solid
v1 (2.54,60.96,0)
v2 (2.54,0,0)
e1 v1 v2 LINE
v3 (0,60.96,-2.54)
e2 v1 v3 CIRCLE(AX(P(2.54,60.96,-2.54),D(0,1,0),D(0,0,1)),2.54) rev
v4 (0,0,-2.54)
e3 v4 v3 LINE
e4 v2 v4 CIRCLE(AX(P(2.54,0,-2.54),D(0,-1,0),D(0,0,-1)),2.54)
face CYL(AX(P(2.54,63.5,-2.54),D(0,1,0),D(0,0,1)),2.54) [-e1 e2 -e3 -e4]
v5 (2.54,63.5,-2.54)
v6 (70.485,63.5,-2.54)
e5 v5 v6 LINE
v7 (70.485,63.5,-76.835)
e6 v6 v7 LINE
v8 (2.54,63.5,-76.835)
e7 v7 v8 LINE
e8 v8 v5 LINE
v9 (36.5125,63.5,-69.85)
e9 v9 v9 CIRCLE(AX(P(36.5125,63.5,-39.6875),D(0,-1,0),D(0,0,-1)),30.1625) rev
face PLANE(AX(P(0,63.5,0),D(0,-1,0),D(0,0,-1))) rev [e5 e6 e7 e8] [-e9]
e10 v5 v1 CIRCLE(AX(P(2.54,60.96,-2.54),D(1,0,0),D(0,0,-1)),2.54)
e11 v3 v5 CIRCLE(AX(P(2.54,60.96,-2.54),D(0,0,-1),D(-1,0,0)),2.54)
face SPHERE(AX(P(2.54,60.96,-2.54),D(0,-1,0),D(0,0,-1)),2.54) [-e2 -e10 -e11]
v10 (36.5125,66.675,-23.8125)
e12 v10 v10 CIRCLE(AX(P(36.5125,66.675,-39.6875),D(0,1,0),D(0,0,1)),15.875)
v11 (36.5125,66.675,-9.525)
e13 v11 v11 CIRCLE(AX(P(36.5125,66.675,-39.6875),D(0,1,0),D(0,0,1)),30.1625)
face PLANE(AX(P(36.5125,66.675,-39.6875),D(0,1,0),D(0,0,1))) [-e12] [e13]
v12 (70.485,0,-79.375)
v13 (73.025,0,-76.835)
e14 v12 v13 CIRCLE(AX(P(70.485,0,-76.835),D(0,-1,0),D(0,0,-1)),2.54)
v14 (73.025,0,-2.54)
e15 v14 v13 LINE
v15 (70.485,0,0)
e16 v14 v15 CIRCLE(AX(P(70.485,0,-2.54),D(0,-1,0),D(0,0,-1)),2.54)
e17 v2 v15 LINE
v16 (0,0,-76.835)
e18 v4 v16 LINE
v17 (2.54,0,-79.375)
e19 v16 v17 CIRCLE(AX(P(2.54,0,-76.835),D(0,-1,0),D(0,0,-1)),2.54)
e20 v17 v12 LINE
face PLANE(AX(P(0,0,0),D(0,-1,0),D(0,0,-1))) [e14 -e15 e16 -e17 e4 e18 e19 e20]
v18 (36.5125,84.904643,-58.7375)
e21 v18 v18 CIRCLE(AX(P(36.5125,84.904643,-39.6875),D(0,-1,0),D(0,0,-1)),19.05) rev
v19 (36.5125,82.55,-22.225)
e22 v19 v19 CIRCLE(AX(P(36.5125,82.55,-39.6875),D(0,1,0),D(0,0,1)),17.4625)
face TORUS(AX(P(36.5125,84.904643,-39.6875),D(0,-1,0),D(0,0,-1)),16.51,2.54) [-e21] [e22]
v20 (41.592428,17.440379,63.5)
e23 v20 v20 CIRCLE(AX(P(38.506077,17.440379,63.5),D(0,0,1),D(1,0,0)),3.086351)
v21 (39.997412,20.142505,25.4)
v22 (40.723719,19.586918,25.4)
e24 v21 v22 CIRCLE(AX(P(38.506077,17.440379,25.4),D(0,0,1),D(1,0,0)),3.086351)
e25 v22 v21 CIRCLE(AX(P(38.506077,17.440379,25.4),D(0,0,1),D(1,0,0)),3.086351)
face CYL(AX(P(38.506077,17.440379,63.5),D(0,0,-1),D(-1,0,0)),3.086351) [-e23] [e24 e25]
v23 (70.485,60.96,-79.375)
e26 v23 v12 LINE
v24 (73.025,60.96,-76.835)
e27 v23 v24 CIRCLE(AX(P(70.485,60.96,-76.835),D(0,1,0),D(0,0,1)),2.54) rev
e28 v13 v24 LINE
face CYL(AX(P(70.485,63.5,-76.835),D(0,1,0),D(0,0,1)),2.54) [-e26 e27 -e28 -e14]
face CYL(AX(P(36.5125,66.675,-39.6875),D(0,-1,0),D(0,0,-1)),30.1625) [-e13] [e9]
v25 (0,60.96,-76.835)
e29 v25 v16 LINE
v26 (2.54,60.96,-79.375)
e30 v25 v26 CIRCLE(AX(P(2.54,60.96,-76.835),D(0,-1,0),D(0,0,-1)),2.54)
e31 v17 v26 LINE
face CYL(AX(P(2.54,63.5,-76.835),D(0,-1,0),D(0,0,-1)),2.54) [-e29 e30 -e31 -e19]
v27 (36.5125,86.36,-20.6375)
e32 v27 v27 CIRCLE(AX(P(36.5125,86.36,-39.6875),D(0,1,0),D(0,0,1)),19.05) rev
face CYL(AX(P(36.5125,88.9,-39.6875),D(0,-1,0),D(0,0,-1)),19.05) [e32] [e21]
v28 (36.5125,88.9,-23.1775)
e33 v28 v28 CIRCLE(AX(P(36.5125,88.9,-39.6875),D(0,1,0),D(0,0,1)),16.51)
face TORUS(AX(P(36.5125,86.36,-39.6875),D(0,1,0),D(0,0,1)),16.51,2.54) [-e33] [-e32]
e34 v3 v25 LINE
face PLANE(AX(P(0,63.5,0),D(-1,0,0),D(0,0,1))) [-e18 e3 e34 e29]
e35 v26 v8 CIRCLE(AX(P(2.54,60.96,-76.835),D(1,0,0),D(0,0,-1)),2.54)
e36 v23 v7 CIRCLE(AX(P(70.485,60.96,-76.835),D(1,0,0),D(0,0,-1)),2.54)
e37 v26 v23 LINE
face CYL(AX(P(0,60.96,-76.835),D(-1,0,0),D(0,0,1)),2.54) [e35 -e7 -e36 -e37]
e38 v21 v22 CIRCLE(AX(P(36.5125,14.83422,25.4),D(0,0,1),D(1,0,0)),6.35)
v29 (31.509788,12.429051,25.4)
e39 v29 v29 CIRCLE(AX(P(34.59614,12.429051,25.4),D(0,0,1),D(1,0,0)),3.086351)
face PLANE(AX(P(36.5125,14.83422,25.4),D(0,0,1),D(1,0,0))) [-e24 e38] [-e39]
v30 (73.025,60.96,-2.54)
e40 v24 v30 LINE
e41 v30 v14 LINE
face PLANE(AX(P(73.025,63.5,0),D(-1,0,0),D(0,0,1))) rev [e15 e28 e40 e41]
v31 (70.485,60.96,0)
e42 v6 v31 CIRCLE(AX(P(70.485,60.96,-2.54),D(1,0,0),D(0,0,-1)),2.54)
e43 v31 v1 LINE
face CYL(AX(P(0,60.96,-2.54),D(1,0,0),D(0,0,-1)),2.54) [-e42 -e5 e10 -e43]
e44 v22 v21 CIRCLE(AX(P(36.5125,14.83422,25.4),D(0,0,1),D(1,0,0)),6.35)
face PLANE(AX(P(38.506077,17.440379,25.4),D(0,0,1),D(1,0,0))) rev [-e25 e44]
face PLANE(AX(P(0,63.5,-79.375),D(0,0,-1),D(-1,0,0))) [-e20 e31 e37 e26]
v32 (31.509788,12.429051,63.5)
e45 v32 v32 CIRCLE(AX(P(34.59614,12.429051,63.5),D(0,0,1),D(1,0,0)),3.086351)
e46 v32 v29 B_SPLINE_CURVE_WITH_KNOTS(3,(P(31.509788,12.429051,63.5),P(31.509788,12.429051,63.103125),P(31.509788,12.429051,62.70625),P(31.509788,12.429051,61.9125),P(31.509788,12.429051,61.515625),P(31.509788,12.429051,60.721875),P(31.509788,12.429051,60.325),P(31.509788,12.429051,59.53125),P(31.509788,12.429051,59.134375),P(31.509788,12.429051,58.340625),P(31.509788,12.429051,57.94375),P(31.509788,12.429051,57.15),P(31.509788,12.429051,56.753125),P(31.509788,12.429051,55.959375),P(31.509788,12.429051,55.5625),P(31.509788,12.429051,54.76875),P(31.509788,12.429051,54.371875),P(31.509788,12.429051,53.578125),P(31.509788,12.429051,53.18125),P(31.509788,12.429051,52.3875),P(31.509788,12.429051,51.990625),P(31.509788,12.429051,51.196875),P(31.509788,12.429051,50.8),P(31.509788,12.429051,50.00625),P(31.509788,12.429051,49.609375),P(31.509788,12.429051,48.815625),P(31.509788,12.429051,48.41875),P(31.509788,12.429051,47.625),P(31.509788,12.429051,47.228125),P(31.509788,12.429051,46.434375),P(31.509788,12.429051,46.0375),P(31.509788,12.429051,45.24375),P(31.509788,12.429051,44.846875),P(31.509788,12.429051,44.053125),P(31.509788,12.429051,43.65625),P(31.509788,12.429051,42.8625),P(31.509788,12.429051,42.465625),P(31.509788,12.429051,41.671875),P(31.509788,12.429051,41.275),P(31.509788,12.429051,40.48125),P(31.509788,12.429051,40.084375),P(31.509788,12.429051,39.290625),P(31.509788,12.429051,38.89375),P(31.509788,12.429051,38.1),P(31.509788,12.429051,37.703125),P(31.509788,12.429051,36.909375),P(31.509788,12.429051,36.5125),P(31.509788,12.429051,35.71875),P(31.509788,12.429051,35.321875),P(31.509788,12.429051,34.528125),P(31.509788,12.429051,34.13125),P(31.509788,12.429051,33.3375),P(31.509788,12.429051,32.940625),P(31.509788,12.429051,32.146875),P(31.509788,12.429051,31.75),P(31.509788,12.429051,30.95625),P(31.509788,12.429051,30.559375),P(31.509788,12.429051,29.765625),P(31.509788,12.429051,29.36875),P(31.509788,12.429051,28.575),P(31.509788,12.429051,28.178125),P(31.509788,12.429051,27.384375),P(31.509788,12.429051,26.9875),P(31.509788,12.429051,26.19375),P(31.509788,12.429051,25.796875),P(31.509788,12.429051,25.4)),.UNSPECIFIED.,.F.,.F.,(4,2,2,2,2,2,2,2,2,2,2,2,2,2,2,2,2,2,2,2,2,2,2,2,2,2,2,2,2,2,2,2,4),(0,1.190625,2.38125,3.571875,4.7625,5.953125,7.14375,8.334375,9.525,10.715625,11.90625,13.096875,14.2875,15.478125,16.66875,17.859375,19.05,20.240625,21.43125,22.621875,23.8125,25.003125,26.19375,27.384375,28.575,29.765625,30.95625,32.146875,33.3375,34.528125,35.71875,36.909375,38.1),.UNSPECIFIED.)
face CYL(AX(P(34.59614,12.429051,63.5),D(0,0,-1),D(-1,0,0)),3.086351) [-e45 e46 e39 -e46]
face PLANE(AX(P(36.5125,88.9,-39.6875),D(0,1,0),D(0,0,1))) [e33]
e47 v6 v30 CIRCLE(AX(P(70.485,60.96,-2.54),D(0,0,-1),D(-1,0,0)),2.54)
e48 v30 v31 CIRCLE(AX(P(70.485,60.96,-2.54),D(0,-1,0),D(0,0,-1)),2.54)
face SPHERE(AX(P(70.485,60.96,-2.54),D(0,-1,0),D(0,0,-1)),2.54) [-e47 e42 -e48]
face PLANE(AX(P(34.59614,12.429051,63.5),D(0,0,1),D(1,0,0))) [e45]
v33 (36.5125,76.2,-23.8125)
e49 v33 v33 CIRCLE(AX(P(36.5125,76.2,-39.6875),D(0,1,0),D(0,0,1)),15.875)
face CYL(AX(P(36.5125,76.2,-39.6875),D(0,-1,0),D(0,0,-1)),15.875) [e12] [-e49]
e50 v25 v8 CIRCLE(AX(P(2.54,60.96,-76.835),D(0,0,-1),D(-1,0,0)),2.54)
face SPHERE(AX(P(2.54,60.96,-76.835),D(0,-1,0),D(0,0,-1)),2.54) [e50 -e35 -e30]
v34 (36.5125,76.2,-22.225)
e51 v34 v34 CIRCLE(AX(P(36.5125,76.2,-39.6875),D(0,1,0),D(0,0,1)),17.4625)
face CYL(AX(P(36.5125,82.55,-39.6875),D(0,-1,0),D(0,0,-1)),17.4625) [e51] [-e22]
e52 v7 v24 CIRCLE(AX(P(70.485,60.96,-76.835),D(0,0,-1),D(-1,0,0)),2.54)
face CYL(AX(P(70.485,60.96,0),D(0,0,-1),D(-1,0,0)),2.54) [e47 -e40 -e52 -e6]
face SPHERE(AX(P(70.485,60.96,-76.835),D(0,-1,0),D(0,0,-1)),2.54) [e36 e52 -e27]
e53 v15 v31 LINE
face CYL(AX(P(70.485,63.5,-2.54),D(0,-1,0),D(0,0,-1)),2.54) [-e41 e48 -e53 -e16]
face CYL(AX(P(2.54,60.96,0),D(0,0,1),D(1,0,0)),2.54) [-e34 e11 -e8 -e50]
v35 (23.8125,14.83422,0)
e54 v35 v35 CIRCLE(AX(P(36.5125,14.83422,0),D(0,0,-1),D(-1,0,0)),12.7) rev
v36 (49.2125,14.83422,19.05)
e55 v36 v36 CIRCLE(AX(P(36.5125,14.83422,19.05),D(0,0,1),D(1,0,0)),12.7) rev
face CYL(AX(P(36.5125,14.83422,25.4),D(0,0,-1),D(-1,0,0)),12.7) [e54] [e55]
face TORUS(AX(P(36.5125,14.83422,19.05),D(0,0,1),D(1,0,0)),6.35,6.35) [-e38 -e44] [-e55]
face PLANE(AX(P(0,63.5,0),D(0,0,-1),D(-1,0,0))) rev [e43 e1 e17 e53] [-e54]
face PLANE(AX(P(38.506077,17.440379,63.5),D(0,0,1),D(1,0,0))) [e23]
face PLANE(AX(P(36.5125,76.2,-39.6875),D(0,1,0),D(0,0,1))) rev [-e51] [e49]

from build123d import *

# Parameters (mm, degrees)
SKETCH1_W           = 73.025
SKETCH1_H           = 79.375
BOSS_EXTRUDE1_DEPTH = 63.5
SKETCH2_R           = 15.875
BOSS_EXTRUDE2_DEPTH = 12.7
SKETCH3_R           = 30.1625
BOSS_EXTRUDE3_DEPTH = 3.175
SKETCH4_R           = 17.4625
BOSS_EXTRUDE4_DEPTH = 6.35
SKETCH5_R           = 19.05
BOSS_EXTRUDE5_DEPTH = 6.35
FILLET1_R           = 2.54
FILLET2_R           = 2.54
FILLET5_R           = 2.54
SKETCH7_R           = 12.7
BOSS_EXTRUDE7_DEPTH = 25.4
FILLET6_R           = 6.35
SKETCH8_R           = 3.086351458
BOSS_EXTRUDE8_DEPTH = 38.1


with BuildPart() as part:
    # Sketch1 → Boss-Extrude1 (new body)
    with BuildSketch(Plane(origin=(0, 0, 0), x_dir=(1, 0, 0), z_dir=(0, 1, 0))):
        with Locations((36.5125, 39.6875)):
            Rectangle(SKETCH1_W, SKETCH1_H)
    extrude(amount=BOSS_EXTRUDE1_DEPTH)

    # Sketch2 → Boss-Extrude2 (add)
    with BuildSketch(Plane(origin=(0, 63.5, 0), x_dir=(1, 0, 0), z_dir=(0, 1, 0))):
        with Locations(Location((36.5125, 39.6875, 0), (0, 0, 270))):
            Circle(SKETCH2_R)
    extrude(amount=BOSS_EXTRUDE2_DEPTH)

    # Sketch3 → Boss-Extrude3 (add)
    with BuildSketch(Plane(origin=(0, 63.5, 0), x_dir=(1, 0, 0), z_dir=(0, 1, 0))):
        with Locations(Location((36.5125, 39.6875, 0), (0, 0, 90))):
            Circle(SKETCH3_R)
    extrude(amount=BOSS_EXTRUDE3_DEPTH)

    # Sketch4 → Boss-Extrude4 (add)
    with BuildSketch(Plane(origin=(0, 76.2, 0), x_dir=(1, 0, 0), z_dir=(0, 1, 0))):
        with Locations(Location((36.5125, 39.6875, 0), (0, 0, 270))):
            Circle(SKETCH4_R)
    extrude(amount=BOSS_EXTRUDE4_DEPTH)

    # Sketch5 → Boss-Extrude5 (add)
    with BuildSketch(Plane(origin=(0, 82.55, 0), x_dir=(1, 0, 0), z_dir=(0, 1, 0))):
        with Locations(Location((36.5125, 39.6875, 0), (0, 0, 270))):
            Circle(SKETCH5_R)
    extrude(amount=BOSS_EXTRUDE5_DEPTH)

    # Fillet1
    # the kernel refuses this fillet: 2.54 mm, written as the material it takes off along each edge
    with BuildSketch(Plane(origin=(36.5125, 82.55, -39.6875), x_dir=(0, 0, 1), z_dir=(-1, 0, 0))) as fillet1_piece_1:
        with BuildLine():
            CenterArc((16.51, 2.35464302), FILLET1_R, 292.024312837, 67.975687163)
            Line((17.4625, 0), (17.48155, -0.04709286))
            ThreePointArc((17.48155, -0.04709286), (18.25625, -0.0508), (19.05, -0.0508))
            Line((19.05, -0.0508), (19.1008, 0))
            Line((19.1008, 0), (19.1008, 2.35464302))
            Line((19.1008, 2.35464302), (19.05, 2.35464302))
        make_face()
    revolve(axis=Axis((36.5125, 82.55, -39.6875), (0, 1, 0)), mode=Mode.SUBTRACT)
    with BuildSketch(Plane(origin=(36.5125, 88.9, -39.6875), x_dir=(0, 0, 1), z_dir=(-1, 0, 0))) as fillet1_piece_2:
        with BuildLine():
            CenterArc((19.05 - FILLET1_R, -FILLET1_R), FILLET1_R, 0, 90)
            Line((19.05 - FILLET1_R, 0), (19.05 - FILLET1_R, FILLET1_R * 0.02))
            Line((19.05 - FILLET1_R, FILLET1_R * 0.02), (19.05 + FILLET1_R * 0.02, FILLET1_R * 0.02))
            Line((19.05 + FILLET1_R * 0.02, FILLET1_R * 0.02), (19.05 + FILLET1_R * 0.02, -FILLET1_R))
            Line((19.05 + FILLET1_R * 0.02, -FILLET1_R), (19.05, -FILLET1_R))
        make_face()
    revolve(axis=Axis((36.5125, 88.9, -39.6875), (0, 1, 0)), mode=Mode.SUBTRACT)

    # Fillet2
    fillet2_edges = [part.edges().sort_by_distance(p)[0] for p in [
        (0, 31.75, 0),
        (73.025, 31.75, 0),
        (73.025, 31.75, -79.375),
        (0, 31.75, -79.375),
    ]]
    fillet(fillet2_edges, radius=FILLET2_R)

    # Fillet5
    fillet5_edges = [part.edges().sort_by_distance(p)[0] for p in [
        (36.5125, 63.5, -79.375),
        (73.025, 63.5, -39.6875),
        (0, 63.5, -39.6875),
        (36.5125, 63.5, 0),
        (0.743948776, 63.5, -78.631051224),
        (0.743948776, 63.5, -0.743948776),
        (72.281051224, 63.5, -0.743948776),
        (72.281051224, 63.5, -78.631051224),
    ]]
    fillet(fillet5_edges, radius=FILLET5_R)

    # Sketch7 → Boss-Extrude7 (add)
    with BuildSketch(Plane.XY):
        with Locations(Location((36.5125, 14.834220105, 0), (0, 0, 180))):
            Circle(SKETCH7_R)
    extrude(amount=BOSS_EXTRUDE7_DEPTH)

    # Fillet6
    fillet6_edges = [part.edges().sort_by_distance(p)[0] for p in [
        (49.2125, 14.834220105, 25.4),
    ]]
    fillet(fillet6_edges, radius=FILLET6_R)

    # Sketch8 → Boss-Extrude8 (add)
    with BuildSketch(Plane.XY.offset(25.4)):
        with Locations(Location((38.506076801, 17.440379035, 0), (0, 0, 61.105176003))):
            Circle(SKETCH8_R)
        with Locations(Location((34.596139796, 12.429051324, 0), (0, 0, 180))):
            Circle(SKETCH8_R)
    extrude(amount=BOSS_EXTRUDE8_DEPTH)


solid = part.part
